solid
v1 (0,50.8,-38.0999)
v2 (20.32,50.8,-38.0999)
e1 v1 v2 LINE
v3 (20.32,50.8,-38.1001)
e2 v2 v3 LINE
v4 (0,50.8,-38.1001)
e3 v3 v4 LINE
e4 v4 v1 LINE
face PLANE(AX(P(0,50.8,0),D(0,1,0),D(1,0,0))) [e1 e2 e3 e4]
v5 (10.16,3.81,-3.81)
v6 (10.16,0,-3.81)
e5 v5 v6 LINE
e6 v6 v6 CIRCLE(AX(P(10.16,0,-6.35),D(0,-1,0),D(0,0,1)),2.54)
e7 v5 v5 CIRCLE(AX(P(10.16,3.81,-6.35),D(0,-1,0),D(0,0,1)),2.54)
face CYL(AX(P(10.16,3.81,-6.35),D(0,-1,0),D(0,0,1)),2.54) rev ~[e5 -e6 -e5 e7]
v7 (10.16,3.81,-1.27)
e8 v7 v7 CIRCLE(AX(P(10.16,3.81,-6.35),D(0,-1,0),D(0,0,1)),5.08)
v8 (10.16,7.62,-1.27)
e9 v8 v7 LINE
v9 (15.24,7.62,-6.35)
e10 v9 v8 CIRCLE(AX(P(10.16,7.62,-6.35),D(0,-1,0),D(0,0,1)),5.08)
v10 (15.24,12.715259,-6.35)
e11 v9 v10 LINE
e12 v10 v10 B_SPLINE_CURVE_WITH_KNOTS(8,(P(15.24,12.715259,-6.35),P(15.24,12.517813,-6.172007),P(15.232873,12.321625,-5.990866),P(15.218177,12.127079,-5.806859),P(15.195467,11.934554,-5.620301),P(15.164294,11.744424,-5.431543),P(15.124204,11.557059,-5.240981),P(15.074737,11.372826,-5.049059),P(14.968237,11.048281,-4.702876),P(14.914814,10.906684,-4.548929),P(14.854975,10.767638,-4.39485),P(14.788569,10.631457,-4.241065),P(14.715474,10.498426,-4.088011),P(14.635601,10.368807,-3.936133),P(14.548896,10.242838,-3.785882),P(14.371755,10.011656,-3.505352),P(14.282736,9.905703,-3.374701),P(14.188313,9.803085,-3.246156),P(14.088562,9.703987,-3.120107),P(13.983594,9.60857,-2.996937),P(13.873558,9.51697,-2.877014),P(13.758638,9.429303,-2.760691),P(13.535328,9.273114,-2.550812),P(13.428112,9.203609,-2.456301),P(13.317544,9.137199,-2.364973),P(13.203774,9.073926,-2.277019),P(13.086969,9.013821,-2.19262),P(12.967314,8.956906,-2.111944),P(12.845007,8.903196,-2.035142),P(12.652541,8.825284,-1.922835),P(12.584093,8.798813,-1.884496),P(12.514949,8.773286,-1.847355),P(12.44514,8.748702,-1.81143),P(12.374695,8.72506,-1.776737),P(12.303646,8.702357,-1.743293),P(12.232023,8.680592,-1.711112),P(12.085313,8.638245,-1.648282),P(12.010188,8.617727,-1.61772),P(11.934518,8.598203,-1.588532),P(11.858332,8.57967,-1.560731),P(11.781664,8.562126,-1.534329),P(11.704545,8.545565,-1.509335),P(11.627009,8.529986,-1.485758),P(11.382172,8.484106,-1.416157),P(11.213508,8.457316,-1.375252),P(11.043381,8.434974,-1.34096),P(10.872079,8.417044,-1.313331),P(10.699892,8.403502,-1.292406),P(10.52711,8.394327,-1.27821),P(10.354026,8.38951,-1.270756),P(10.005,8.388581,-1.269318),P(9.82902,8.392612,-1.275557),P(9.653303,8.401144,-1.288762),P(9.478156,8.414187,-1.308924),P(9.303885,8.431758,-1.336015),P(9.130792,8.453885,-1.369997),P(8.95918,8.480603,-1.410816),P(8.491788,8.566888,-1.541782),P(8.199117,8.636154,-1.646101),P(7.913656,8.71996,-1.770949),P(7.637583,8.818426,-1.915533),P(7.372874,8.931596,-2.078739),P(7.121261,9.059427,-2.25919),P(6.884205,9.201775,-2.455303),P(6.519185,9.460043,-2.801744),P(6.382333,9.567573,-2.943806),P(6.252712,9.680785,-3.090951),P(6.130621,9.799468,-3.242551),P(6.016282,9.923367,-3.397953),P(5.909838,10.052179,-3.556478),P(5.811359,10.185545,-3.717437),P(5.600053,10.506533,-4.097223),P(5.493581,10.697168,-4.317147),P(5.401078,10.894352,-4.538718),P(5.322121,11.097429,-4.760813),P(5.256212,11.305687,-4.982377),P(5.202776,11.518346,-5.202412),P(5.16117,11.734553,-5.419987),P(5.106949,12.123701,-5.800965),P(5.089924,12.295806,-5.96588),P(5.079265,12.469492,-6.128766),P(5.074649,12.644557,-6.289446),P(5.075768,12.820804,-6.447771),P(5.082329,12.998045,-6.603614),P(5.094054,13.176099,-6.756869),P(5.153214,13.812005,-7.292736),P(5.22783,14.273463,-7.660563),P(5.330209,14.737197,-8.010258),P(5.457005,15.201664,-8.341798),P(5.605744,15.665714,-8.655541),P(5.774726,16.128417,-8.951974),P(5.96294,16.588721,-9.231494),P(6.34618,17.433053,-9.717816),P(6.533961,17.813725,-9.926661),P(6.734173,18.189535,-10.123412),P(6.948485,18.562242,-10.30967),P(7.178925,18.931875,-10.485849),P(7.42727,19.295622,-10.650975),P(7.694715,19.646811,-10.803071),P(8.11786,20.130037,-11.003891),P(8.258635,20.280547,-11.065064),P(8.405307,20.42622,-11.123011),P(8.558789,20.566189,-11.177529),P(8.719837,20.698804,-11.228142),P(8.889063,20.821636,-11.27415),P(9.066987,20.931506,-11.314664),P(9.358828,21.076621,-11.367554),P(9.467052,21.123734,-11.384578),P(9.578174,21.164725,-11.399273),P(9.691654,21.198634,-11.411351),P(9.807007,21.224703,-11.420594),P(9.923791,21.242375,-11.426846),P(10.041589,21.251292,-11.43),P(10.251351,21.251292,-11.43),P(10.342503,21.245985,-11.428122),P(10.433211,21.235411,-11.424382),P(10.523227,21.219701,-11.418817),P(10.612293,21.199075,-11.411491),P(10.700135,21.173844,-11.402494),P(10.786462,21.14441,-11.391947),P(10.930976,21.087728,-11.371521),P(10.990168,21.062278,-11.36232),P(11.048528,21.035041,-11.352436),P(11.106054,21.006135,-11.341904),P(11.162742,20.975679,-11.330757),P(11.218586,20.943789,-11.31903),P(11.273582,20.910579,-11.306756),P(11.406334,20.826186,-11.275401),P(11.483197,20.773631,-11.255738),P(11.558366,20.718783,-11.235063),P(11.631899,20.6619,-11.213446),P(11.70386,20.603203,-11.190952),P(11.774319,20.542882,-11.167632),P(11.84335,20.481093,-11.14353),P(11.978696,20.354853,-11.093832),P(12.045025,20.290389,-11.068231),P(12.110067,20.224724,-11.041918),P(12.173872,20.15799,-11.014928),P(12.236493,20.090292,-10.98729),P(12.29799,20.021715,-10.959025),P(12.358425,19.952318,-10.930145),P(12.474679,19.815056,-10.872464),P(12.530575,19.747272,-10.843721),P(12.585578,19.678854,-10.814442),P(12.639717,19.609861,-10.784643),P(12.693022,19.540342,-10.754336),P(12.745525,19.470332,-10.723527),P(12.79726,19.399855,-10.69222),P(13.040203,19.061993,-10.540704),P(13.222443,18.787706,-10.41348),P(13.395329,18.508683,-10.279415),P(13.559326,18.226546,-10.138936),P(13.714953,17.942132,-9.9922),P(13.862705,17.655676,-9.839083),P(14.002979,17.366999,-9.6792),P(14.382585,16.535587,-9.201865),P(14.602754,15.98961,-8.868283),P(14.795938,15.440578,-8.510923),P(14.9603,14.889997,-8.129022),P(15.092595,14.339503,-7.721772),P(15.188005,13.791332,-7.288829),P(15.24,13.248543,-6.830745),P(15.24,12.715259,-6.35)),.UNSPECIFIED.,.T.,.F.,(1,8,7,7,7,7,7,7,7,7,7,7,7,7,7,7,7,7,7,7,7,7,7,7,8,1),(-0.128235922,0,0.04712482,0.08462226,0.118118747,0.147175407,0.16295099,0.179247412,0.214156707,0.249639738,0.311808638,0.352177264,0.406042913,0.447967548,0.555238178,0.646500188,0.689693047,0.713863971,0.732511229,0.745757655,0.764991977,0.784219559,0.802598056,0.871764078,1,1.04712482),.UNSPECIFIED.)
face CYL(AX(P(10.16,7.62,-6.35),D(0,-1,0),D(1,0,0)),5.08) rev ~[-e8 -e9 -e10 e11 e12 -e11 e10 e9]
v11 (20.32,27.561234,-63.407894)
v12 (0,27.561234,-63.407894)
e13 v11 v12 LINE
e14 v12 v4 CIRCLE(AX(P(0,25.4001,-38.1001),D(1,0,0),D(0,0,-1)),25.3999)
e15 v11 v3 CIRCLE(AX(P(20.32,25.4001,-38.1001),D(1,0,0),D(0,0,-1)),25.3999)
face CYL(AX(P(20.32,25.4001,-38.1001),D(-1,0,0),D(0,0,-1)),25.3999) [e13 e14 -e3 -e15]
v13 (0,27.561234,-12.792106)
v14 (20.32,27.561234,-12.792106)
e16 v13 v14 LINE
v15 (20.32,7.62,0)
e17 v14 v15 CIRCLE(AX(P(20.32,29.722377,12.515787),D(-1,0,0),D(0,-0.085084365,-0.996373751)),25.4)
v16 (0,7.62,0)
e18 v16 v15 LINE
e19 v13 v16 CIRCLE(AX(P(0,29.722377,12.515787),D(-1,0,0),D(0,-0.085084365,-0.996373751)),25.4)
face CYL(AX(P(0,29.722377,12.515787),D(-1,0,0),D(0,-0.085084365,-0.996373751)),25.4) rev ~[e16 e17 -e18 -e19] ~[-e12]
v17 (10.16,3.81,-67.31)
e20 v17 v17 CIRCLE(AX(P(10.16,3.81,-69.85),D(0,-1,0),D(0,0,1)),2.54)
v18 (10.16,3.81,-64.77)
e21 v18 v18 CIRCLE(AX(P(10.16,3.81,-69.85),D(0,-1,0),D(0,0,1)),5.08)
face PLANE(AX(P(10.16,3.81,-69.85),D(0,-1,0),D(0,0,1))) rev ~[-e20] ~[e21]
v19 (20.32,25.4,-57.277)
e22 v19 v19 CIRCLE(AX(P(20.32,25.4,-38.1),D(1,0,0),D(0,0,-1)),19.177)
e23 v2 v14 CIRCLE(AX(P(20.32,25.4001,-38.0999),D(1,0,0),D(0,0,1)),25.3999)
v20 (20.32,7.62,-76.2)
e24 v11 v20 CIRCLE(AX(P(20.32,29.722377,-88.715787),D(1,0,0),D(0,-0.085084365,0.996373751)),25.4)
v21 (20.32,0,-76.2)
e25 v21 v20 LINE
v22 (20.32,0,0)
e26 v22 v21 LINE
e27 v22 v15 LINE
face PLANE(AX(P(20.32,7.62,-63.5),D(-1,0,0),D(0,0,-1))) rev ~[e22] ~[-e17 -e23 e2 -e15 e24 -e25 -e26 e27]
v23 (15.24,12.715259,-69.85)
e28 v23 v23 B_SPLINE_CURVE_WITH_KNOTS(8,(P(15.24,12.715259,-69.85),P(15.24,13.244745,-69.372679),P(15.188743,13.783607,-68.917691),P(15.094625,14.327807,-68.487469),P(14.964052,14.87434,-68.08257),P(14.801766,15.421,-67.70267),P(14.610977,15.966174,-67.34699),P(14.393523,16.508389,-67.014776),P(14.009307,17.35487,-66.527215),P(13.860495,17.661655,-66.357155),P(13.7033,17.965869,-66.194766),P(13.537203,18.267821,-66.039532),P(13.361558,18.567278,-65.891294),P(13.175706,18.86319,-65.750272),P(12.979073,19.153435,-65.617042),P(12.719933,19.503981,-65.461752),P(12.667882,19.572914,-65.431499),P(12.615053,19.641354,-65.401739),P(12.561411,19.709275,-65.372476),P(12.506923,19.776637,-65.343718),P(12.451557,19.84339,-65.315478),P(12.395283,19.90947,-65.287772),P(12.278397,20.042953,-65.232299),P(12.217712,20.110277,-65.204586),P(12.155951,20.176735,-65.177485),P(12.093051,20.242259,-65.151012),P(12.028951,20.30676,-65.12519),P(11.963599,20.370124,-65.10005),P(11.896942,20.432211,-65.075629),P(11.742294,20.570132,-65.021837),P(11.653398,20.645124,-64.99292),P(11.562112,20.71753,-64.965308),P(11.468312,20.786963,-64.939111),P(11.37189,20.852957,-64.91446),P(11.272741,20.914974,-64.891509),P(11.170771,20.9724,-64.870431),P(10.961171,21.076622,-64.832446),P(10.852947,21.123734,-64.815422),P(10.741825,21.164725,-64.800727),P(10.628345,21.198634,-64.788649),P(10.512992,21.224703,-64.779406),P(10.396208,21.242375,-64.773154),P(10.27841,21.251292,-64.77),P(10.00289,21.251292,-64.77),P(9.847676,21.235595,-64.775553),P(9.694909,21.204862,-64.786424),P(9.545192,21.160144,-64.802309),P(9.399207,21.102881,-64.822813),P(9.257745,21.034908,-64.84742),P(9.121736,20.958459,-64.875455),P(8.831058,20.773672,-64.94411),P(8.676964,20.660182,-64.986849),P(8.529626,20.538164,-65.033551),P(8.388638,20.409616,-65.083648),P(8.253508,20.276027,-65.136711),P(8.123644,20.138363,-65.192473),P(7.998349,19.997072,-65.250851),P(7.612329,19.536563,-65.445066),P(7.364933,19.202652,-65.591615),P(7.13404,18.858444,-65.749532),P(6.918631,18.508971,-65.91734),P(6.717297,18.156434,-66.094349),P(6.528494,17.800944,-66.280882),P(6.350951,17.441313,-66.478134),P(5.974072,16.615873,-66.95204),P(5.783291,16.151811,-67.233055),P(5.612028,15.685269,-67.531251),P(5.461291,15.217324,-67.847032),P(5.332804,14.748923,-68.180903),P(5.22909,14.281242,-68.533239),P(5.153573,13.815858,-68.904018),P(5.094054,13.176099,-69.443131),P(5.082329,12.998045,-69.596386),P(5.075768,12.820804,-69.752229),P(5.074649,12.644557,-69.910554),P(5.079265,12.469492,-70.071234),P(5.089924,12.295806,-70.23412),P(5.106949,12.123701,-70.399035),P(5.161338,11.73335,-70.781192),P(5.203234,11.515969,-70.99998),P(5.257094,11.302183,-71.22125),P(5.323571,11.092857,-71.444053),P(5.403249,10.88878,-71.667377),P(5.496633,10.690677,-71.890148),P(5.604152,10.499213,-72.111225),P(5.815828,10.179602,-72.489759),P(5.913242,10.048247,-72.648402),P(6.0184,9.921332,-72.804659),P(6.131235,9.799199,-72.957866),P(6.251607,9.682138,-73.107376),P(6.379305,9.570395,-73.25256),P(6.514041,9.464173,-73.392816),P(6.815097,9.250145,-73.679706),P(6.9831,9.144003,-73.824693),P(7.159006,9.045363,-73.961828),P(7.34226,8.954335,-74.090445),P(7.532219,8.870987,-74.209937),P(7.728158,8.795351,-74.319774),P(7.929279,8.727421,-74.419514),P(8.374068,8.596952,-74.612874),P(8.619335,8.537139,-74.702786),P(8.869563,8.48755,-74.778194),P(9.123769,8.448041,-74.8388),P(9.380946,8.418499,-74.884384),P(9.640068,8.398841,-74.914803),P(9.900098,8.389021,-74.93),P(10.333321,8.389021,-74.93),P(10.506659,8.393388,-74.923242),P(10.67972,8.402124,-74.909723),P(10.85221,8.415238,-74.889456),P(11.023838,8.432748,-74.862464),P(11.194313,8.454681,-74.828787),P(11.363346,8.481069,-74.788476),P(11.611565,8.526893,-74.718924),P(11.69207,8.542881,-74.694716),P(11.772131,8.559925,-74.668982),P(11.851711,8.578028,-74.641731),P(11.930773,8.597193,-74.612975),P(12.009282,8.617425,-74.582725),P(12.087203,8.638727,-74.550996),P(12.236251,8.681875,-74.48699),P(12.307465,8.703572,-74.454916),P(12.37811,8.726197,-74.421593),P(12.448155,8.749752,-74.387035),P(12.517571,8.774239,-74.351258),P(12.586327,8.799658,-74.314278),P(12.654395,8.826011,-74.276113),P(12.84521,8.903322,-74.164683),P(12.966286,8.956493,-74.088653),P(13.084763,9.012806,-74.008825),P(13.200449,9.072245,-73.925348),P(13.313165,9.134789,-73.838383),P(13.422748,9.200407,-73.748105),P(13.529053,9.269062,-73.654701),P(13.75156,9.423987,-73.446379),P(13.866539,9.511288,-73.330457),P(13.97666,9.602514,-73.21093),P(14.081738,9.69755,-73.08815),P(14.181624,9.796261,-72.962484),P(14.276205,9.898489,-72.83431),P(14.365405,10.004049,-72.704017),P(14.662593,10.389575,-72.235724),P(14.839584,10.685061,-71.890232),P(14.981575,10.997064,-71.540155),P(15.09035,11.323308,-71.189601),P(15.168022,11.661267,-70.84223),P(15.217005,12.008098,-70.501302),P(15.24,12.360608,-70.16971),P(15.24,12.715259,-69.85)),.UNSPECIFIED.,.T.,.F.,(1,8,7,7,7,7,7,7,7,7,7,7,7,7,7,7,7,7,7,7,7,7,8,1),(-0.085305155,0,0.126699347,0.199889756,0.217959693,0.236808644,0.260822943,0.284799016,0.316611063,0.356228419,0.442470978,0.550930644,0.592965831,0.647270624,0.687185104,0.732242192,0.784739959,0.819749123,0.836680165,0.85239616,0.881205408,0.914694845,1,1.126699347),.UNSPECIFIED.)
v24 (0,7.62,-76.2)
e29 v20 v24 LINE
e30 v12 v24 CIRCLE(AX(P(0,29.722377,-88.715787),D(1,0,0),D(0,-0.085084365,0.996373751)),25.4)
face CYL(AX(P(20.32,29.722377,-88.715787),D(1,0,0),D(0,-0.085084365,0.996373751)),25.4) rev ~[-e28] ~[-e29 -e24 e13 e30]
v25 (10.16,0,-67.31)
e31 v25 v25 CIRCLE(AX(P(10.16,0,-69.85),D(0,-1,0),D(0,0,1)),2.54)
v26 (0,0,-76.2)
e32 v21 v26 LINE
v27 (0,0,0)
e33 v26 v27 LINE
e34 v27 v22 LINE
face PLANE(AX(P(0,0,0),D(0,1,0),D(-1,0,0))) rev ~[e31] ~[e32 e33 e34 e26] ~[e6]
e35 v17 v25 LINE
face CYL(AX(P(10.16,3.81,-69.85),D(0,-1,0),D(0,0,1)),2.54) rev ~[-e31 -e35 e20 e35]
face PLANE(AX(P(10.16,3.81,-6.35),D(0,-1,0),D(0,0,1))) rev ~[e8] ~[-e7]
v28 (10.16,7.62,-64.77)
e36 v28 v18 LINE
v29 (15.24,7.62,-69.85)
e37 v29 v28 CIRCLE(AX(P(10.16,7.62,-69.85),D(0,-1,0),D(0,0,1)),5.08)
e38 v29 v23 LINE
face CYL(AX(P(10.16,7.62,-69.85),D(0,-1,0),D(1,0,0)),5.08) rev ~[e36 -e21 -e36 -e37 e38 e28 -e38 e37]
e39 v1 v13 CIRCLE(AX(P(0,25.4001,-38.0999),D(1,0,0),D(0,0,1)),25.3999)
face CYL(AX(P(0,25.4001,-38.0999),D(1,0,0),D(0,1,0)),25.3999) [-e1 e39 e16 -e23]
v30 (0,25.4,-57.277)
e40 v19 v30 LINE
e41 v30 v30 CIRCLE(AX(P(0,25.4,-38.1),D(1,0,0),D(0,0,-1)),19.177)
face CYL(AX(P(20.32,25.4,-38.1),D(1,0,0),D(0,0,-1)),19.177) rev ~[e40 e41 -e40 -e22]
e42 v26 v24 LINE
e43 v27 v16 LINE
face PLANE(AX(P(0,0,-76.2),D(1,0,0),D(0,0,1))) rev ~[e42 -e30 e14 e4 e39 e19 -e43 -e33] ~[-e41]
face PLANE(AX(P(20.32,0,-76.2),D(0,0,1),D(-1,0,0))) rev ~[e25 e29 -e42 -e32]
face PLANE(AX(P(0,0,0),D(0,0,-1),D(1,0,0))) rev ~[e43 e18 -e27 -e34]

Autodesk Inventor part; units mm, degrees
ref_plane "YZ Plane" through (0, 0, 0) normal (1, 0, 0) x (0, 1, 0)
ref_plane "XZ Plane" through (0, 0, 0) normal (0, 1, 0) x (-1, 0, 0)
ref_plane "XY Plane" through (0, 0, 0) normal (0, 0, 1) x (1, 0, 0)
sketch "Sketch1" plane through (0, 0, 0) normal (0, 1, 0) x (-1, 0, 0)
  line L0 (0, 0) -> (-20.32, 0)
  line L1 (-20.32, 0) -> (-20.32, -76.2)
  line L2 (-20.32, -76.2) -> (0, -76.2)
  line L3 (0, -76.2) -> (0, 0)
  dimension "d0" = 20.32
  dimension "d1" = 76.2
extrude "Extrusion1" add sketch "Sketch1" along normal blind 7.62
sketch "Sketch2" plane through (0, 7.62, 0) normal (0, 1, 0) x (1, 0, 0)
  line L0 (0, 76.2) -> (0, 0) projected
  line L1 (0, 0) -> (0, 12.7)
  line L2 (0, 12.7) -> (20.32, 12.7)
  line L3 (20.32, 12.7) -> (20.32, 63.5)
  line L4 (20.32, 63.5) -> (0, 63.5)
  line L5 (0, 63.5) -> (0, 12.7)
  dimension "d4" = 12.7
  dimension "d5" = 20.32
  dimension "d6" = 50.8
extrude "Extrusion2" add sketch "Sketch2" along normal blind 43.18
sketch "Sketch3" plane through (20.32, 0, 0) normal (1, 0, 0) x (0, 0, -1)
  line L0 (12.7, 50.8) -> (63.5, 50.8) projected
  line L1 (38.1, 50.8) -> (38.1, 25.4)
  circle A0 centre (38.1, 25.4) radius 19.177
  point P0 (0, 0)
  dimension "d9" = 25.4
  dimension "d10" = 38.354
extrude "Extrusion3" cut sketch "Sketch3" against normal blind 43.18
fillet "Fillet1" radius 25.4 2 edges at (10.16, 50.8, -12.7) (10.16, 50.8, -63.5)
sketch "Sketch4" plane through (0, 7.62, 0) normal (0, 1, 0) x (1, 0, 0)
  line L0 (0, 0) -> (20.32, 0) projected
  line L1 (10.16, 0) -> (10.16, 6.35)
  line L2 (20.32, 76.2) -> (0, 76.2) projected
  line L3 (10.16, 76.2) -> (10.16, 69.85)
  dimension "d14" = 6.35
  dimension "d15" = 6.35
fillet "Fillet2" radius 25.4 1 edges at (10.16, 7.62, -12.7)
fillet "Fillet3" radius 25.4 1 edges at (10.16, 7.62, -63.5)
hole "Hole1" at (10.16, 7.62, -6.35) at (10.16, 7.62, -69.85) direction (0, -1, 0) diameter 5.08 end through all counterbore diameter 10.16 counterbore depth 3.81
sketch "Sketch5" plane through (10.16, 7.62, -6.35) normal (0, -1, 0) x (1, 0, 0)
  circle A0 centre (0, 0) radius 5.08
  circle A1 centre (0, -63.5) radius 2.54 projected
  line L0 (-2.54, -63.5) -> (0, -63.5)
  circle A2 centre (0, -63.5) radius 5.08
  point P0 (-10.16, 6.35)
  dimension "d25" = 10.16
  dimension "d26" = 10.16
extrude "Extrusion4" cut sketch "Sketch5" against normal blind 43.18 contours A0 | A1 | A2
properties part number "Motor Mount Back Side"
